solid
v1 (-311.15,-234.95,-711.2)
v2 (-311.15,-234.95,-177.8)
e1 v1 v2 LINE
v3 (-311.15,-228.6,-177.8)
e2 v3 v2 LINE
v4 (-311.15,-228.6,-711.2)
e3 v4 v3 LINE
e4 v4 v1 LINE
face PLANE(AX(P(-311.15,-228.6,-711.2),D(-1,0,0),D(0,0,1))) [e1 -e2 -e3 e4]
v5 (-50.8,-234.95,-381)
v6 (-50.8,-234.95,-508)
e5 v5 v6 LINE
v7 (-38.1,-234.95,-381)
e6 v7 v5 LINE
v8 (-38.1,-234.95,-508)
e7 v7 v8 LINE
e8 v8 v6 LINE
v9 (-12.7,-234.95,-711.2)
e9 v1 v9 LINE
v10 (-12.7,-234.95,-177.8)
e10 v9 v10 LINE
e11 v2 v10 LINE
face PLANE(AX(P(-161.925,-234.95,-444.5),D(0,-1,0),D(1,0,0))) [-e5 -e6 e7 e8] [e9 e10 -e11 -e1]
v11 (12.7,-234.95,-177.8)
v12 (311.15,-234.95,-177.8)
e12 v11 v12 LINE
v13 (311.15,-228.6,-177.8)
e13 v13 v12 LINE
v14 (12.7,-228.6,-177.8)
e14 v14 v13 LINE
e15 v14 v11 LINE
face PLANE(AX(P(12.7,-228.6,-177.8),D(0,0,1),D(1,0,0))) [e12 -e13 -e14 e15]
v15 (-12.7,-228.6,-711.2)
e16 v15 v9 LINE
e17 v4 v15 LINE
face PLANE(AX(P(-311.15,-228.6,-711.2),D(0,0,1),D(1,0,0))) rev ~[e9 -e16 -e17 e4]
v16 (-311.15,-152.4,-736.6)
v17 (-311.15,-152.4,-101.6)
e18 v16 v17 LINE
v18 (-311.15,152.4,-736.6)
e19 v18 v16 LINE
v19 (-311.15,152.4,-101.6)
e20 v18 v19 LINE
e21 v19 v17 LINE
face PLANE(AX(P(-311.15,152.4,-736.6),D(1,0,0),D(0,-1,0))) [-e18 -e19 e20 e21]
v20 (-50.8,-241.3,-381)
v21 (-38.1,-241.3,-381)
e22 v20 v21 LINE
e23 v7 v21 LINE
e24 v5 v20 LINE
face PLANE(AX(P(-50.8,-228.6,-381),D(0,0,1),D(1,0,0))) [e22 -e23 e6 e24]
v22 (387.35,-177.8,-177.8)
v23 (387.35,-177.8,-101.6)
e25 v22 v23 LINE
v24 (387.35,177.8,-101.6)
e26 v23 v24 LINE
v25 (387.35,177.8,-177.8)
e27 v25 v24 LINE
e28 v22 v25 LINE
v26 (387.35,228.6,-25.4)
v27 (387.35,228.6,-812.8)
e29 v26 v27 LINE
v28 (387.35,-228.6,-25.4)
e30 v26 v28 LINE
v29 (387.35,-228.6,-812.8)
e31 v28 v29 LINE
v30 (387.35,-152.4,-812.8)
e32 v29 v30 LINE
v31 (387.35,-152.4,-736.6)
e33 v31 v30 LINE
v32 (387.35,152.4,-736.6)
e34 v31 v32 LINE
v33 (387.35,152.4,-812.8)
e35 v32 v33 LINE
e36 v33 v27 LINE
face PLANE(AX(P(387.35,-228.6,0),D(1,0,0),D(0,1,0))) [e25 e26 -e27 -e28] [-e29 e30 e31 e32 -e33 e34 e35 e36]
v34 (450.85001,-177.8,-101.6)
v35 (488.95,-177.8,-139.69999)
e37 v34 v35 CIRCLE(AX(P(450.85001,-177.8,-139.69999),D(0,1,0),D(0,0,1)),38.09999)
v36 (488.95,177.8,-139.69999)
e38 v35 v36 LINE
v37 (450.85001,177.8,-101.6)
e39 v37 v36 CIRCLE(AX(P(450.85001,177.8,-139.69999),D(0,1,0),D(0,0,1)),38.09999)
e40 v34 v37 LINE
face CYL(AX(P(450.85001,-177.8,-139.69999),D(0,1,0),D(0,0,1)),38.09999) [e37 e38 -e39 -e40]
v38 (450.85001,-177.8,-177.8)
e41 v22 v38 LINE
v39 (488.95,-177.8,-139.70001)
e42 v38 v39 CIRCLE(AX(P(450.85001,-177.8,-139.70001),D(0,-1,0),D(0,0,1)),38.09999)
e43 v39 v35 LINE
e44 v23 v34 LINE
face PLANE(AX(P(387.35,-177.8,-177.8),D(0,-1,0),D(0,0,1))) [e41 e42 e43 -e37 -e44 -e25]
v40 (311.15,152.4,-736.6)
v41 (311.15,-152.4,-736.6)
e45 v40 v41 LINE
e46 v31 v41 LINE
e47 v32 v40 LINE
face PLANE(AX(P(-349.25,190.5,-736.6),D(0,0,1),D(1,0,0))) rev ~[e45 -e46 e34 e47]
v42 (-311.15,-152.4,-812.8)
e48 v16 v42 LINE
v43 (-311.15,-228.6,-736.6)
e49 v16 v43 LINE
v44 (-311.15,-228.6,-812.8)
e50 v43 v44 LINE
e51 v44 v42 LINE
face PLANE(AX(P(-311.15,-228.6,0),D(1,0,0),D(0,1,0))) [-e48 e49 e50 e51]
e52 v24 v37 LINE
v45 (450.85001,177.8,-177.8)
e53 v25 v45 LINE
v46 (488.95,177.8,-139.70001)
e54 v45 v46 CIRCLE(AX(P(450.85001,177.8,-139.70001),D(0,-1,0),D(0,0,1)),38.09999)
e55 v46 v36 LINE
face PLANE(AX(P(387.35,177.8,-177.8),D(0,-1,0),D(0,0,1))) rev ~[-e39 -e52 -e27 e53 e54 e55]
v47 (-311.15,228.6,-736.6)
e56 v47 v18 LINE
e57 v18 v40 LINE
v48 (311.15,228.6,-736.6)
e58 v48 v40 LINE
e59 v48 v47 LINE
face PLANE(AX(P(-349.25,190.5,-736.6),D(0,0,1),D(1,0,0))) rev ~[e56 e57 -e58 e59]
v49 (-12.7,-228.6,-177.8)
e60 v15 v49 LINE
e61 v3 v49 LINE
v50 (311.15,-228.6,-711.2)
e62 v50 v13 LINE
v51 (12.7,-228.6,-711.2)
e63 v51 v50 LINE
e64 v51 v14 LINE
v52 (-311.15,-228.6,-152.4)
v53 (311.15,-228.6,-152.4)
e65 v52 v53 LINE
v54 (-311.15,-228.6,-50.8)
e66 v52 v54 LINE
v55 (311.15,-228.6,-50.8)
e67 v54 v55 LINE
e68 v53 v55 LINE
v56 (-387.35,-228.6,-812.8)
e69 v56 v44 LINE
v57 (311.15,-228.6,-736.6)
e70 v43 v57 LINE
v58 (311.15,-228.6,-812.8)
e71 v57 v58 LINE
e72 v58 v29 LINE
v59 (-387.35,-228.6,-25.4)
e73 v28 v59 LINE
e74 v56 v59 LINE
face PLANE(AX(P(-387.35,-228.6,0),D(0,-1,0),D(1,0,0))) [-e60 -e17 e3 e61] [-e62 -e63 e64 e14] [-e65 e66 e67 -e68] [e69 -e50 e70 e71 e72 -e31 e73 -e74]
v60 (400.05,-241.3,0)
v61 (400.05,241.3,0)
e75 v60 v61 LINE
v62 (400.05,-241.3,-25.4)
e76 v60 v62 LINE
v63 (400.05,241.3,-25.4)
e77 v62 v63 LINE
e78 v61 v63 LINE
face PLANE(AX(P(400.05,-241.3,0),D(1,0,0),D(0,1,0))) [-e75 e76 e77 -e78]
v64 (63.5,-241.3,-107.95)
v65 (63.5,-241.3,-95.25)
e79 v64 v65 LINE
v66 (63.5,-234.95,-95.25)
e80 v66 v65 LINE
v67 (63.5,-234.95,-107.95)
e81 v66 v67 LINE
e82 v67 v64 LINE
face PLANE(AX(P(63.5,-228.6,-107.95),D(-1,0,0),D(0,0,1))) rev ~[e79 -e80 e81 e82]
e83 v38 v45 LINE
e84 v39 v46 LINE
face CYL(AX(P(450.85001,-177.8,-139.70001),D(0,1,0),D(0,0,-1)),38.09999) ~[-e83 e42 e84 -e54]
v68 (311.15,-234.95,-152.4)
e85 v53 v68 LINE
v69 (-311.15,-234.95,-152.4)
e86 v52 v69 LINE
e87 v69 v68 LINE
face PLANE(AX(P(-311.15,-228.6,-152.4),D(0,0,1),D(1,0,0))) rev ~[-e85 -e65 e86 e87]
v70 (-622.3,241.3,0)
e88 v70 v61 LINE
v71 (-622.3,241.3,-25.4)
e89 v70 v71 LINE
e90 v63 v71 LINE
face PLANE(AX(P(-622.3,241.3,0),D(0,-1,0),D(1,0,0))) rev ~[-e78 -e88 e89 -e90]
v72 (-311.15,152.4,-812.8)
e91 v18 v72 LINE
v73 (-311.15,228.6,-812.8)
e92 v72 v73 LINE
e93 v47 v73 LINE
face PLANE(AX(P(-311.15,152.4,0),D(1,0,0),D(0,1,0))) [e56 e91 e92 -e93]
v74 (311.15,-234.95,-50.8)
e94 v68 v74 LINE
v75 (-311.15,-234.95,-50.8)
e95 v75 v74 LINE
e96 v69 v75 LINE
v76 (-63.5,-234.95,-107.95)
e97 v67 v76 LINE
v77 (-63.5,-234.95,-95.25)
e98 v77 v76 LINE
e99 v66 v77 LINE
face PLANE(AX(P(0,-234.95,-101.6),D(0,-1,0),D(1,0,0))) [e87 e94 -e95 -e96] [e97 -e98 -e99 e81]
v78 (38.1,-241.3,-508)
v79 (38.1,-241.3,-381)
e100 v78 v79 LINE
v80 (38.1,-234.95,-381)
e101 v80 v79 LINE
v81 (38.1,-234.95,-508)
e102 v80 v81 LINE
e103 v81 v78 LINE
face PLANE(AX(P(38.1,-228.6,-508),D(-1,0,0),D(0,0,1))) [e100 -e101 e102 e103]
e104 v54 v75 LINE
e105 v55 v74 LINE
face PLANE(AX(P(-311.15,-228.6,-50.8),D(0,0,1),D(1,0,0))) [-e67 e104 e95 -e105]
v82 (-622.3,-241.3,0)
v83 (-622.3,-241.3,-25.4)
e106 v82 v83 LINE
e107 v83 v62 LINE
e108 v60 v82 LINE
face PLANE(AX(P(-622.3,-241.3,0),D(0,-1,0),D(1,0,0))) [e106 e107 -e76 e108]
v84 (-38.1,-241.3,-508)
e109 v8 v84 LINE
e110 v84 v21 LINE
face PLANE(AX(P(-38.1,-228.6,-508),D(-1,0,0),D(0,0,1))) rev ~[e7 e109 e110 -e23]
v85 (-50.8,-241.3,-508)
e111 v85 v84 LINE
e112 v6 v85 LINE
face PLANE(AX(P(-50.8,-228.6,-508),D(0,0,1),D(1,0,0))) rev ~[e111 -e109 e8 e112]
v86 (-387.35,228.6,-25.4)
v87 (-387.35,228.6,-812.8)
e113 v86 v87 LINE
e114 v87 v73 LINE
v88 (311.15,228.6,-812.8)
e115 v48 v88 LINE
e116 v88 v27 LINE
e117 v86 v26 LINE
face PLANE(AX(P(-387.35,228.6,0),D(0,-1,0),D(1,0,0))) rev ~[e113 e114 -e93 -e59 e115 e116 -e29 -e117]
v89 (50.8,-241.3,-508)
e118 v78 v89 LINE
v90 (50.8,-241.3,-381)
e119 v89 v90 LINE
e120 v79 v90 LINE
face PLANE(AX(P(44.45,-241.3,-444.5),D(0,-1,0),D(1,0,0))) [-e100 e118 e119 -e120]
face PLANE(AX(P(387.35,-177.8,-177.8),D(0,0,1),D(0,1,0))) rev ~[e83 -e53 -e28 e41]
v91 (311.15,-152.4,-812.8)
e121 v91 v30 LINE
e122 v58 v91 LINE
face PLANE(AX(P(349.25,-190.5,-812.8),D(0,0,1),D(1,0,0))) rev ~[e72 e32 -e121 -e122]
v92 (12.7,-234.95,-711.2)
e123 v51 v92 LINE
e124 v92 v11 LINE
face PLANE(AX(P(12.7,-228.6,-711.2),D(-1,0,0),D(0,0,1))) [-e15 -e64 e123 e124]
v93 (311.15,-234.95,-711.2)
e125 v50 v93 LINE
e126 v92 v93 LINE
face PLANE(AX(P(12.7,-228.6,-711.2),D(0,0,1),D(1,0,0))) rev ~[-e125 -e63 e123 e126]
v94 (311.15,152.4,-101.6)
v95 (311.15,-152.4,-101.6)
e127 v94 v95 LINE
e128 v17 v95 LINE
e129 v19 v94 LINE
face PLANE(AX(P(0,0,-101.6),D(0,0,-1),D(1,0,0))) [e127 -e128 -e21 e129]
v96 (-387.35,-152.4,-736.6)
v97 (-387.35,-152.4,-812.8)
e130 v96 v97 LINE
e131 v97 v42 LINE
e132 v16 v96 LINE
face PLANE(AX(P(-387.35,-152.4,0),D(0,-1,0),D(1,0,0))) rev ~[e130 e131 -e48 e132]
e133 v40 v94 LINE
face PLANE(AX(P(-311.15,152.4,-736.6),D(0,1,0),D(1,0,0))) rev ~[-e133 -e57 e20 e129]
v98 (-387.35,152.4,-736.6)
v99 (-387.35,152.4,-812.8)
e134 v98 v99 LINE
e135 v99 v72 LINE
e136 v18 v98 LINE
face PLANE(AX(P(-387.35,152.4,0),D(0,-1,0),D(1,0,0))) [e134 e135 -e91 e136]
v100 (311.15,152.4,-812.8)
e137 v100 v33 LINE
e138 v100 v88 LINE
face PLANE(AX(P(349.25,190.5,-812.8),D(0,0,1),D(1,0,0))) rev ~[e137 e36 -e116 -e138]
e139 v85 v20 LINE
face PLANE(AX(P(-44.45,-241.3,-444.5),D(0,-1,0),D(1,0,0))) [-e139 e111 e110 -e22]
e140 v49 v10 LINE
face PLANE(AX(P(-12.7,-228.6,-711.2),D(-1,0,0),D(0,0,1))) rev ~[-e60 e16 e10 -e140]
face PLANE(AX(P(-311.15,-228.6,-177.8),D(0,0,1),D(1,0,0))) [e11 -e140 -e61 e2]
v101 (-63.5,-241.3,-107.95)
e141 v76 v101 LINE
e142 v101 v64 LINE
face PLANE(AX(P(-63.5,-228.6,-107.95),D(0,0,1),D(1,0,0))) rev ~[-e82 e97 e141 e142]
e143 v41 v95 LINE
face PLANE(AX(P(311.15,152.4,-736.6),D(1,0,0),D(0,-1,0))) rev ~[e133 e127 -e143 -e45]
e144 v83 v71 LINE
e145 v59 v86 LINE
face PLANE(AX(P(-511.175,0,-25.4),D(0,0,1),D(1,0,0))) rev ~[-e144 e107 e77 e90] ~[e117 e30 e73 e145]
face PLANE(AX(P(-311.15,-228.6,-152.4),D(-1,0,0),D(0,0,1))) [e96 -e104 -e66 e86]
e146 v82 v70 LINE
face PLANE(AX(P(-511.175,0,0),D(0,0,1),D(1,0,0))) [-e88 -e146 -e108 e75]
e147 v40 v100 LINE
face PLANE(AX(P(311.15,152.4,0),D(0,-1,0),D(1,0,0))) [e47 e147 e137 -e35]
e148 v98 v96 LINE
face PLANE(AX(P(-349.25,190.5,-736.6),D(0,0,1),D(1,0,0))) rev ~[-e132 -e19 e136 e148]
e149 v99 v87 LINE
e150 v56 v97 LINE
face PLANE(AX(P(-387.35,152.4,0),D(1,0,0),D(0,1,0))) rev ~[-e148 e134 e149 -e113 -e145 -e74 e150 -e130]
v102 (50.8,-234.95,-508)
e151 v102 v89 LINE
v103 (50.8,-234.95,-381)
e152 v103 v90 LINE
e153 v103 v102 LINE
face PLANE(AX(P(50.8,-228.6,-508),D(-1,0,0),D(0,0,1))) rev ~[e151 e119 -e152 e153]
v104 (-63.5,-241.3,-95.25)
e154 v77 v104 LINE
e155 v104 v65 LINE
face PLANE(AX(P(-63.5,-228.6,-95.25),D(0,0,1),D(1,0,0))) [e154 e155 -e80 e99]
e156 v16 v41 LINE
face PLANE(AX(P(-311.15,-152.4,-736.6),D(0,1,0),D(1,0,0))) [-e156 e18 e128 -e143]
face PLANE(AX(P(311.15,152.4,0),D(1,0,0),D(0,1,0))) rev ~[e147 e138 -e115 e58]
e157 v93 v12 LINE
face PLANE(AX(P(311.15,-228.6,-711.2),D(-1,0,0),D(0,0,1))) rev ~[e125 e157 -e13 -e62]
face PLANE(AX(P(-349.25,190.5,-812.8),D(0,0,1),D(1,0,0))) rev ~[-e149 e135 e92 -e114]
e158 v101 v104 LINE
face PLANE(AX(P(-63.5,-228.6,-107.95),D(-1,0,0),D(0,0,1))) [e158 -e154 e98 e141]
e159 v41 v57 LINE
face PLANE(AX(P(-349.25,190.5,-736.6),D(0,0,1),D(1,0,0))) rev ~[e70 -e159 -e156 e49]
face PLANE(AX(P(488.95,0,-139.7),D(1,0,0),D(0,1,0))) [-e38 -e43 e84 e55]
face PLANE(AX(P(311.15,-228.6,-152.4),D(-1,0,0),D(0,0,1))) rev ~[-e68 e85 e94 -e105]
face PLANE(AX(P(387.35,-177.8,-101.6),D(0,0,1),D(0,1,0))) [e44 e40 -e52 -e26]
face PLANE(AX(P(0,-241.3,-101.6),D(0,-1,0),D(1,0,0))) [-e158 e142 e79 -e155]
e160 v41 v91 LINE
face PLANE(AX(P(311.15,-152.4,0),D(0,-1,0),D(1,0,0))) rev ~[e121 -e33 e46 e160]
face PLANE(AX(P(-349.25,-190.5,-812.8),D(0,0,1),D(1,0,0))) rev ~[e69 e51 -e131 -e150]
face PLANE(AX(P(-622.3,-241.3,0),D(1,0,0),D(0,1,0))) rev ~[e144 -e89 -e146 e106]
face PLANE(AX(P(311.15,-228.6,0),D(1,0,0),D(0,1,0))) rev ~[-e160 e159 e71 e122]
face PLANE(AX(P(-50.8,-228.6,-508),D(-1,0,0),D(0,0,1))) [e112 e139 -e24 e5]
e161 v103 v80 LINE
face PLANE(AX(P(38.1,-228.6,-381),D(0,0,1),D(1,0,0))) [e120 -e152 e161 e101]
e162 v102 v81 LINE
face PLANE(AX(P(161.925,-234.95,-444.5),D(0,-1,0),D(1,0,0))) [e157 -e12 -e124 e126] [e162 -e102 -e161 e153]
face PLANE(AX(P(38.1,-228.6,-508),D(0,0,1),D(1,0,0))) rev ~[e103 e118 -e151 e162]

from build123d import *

# Parameters (mm, degrees)
F0_W      = 76.2
F0_H      = 76.2
F1_DEPTH  = 812.8
F2_DEPTH  = 736.6
F0_W_2    = 800.1
F0_H_2    = 482.6
F3_DEPTH  = 25.4
F4_W      = 355.6
F4_H      = 76.2
F5_DEPTH  = 101.6
F6_R      = 38.09999
F7_W      = 298.45
F7_H      = 533.4
F7_W_2    = 12.7
F7_H_2    = 127
F7_W_3    = 622.3
F7_H_3    = 101.6
F7_W_4    = 127
F7_H_4    = 12.7
F8_DEPTH  = 6.35
F9_DEPTH  = 12.7
F10_W     = 222.25
F10_H     = 482.6
F11_DEPTH = 25.4
F12_W     = 622.3
F12_H     = 304.8
F13_DEPTH = 635


# Not quite as in the source:
# - a fillet or chamfer is up to 0.001 mm smaller than in the source, because OpenCascade refuses the exact size


with BuildPart() as f1:
    # F0 (on Top) → F1 (new body)
    with BuildSketch(Plane.XY):
        with Locations((-349.25, 190.5)):
            Rectangle(F0_W, F0_H)
    extrude(amount=-F1_DEPTH)



with BuildPart() as f1b:
    # F0 (on Top) → F1, piece 2 (new body)
    with BuildSketch(Plane.XY):
        with Locations((-349.25, -190.5)):
            Rectangle(F0_W, F0_H)
    extrude(amount=-F1_DEPTH)


with BuildPart() as f1c:
    # F0 (on Top) → F1, piece 3 (new body)
    with BuildSketch(Plane.XY):
        with Locations((349.25, -190.5)):
            Rectangle(F0_W, F0_H)
    extrude(amount=-F1_DEPTH)


with BuildPart() as f1d:
    # F0 (on Top) → F1, piece 4 (new body)
    with BuildSketch(Plane.XY):
        with Locations((349.25, 190.5)):
            Rectangle(F0_W, F0_H)
    extrude(amount=-F1_DEPTH)


with BuildPart() as f1_1:
    add(f1.part)

    add(f1b.part)  # F2 merges F1b

    add(f1c.part)  # F2 merges F1c

    add(f1d.part)  # F2 merges F1d
    # F0 (on Top) → F2 (join)
    with BuildSketch(Plane.XY):
        with Locations((-349.25, 190.5)):
            Rectangle(F0_W, F0_H)
        Polygon((311.15, 152.4), (311.15, 228.6), (-311.15, 228.6), (-311.15, 152.4), (-387.35, 152.4), (-387.35, -152.4), (-311.15, -152.4), (-311.15, -228.6), (311.15, -228.6), (311.15, -152.4), (387.35, -152.4), (387.35, 152.4), align=None)
        with Locations((-349.25, -190.5)):
            Rectangle(F0_W, F0_H)
        with Locations((349.25, -190.5)):
            Rectangle(F0_W, F0_H)
        with Locations((349.25, 190.5)):
            Rectangle(F0_W, F0_H)
    extrude(amount=-F2_DEPTH)

    # F0 (on Top) → F3 (join)
    with BuildSketch(Plane.XY):
        Rectangle(F0_W_2, F0_H_2)
        Polygon((311.15, 228.6), (387.35, 228.6), (387.35, 152.4), (387.35, -152.4), (387.35, -228.6), (311.15, -228.6), (-311.15, -228.6), (-387.35, -228.6), (-387.35, -152.4), (-387.35, 152.4), (-387.35, 228.6), (-311.15, 228.6), align=None, mode=Mode.SUBTRACT)
    extrude(amount=-F3_DEPTH)

    # F4 (on face) → F5 (join)
    with BuildSketch(Plane.YZ.offset(387.35)):
        with Locations((0, -139.7)):
            Rectangle(F4_W, F4_H)
    extrude(amount=F5_DEPTH)

    # F6 (radius 38.1 in the source; OpenCascade refuses exactly that, so slightly less here)
    f6_edges = [f1_1.edges().sort_by_distance(p)[0] for p in [
        (488.95, 0, -101.6),
        (488.95, 0, -177.8),
    ]]
    fillet(f6_edges, radius=F6_R)

    # F7 (on face) → F8 (join)
    with BuildSketch(Plane.XZ.offset(228.6)):
        with Locations((161.925, -444.5)):
            Rectangle(F7_W, F7_H)
        with Locations((44.45, -444.5)):
            Rectangle(F7_W_2, F7_H_2, mode=Mode.SUBTRACT)
        with Locations((-161.925, -444.5)):
            Rectangle(F7_W, F7_H)
        with Locations((-44.45, -444.5)):
            Rectangle(F7_W_2, F7_H_2, mode=Mode.SUBTRACT)
        with Locations((0, -101.6)):
            Rectangle(F7_W_3, F7_H_3)
        with Locations((0, -101.6)):
            Rectangle(F7_W_4, F7_H_4, mode=Mode.SUBTRACT)
        with Locations((0, -101.6)):
            Rectangle(F7_W_4, F7_H_4)
        with Locations((44.45, -444.5)):
            Rectangle(F7_W_2, F7_H_2)
        with Locations((-44.45, -444.5)):
            Rectangle(F7_W_2, F7_H_2)
    extrude(amount=F8_DEPTH)

    # F7 (on face) → F9 (join)
    with BuildSketch(Plane.XZ.offset(228.6)):
        with Locations((0, -101.6)):
            Rectangle(F7_W_4, F7_H_4)
        with Locations((-44.45, -444.5)):
            Rectangle(F7_W_2, F7_H_2)
        with Locations((44.45, -444.5)):
            Rectangle(F7_W_2, F7_H_2)
    extrude(amount=F9_DEPTH)

    # F10 (on face) → F11 (join, through all)
    with BuildSketch(Plane.XY):
        with Locations((-511.175, 0)):
            Rectangle(F10_W, F10_H)
    extrude(amount=-F11_DEPTH)

    # F12 (on face) → F13 (cut)
    with BuildSketch(Plane(origin=(0, 0, -736.6), x_dir=(1, 0, 0), z_dir=(0, 0, -1))):
        Rectangle(F12_W, F12_H)
    extrude(amount=-F13_DEPTH, mode=Mode.SUBTRACT)


solid = f1_1.part
